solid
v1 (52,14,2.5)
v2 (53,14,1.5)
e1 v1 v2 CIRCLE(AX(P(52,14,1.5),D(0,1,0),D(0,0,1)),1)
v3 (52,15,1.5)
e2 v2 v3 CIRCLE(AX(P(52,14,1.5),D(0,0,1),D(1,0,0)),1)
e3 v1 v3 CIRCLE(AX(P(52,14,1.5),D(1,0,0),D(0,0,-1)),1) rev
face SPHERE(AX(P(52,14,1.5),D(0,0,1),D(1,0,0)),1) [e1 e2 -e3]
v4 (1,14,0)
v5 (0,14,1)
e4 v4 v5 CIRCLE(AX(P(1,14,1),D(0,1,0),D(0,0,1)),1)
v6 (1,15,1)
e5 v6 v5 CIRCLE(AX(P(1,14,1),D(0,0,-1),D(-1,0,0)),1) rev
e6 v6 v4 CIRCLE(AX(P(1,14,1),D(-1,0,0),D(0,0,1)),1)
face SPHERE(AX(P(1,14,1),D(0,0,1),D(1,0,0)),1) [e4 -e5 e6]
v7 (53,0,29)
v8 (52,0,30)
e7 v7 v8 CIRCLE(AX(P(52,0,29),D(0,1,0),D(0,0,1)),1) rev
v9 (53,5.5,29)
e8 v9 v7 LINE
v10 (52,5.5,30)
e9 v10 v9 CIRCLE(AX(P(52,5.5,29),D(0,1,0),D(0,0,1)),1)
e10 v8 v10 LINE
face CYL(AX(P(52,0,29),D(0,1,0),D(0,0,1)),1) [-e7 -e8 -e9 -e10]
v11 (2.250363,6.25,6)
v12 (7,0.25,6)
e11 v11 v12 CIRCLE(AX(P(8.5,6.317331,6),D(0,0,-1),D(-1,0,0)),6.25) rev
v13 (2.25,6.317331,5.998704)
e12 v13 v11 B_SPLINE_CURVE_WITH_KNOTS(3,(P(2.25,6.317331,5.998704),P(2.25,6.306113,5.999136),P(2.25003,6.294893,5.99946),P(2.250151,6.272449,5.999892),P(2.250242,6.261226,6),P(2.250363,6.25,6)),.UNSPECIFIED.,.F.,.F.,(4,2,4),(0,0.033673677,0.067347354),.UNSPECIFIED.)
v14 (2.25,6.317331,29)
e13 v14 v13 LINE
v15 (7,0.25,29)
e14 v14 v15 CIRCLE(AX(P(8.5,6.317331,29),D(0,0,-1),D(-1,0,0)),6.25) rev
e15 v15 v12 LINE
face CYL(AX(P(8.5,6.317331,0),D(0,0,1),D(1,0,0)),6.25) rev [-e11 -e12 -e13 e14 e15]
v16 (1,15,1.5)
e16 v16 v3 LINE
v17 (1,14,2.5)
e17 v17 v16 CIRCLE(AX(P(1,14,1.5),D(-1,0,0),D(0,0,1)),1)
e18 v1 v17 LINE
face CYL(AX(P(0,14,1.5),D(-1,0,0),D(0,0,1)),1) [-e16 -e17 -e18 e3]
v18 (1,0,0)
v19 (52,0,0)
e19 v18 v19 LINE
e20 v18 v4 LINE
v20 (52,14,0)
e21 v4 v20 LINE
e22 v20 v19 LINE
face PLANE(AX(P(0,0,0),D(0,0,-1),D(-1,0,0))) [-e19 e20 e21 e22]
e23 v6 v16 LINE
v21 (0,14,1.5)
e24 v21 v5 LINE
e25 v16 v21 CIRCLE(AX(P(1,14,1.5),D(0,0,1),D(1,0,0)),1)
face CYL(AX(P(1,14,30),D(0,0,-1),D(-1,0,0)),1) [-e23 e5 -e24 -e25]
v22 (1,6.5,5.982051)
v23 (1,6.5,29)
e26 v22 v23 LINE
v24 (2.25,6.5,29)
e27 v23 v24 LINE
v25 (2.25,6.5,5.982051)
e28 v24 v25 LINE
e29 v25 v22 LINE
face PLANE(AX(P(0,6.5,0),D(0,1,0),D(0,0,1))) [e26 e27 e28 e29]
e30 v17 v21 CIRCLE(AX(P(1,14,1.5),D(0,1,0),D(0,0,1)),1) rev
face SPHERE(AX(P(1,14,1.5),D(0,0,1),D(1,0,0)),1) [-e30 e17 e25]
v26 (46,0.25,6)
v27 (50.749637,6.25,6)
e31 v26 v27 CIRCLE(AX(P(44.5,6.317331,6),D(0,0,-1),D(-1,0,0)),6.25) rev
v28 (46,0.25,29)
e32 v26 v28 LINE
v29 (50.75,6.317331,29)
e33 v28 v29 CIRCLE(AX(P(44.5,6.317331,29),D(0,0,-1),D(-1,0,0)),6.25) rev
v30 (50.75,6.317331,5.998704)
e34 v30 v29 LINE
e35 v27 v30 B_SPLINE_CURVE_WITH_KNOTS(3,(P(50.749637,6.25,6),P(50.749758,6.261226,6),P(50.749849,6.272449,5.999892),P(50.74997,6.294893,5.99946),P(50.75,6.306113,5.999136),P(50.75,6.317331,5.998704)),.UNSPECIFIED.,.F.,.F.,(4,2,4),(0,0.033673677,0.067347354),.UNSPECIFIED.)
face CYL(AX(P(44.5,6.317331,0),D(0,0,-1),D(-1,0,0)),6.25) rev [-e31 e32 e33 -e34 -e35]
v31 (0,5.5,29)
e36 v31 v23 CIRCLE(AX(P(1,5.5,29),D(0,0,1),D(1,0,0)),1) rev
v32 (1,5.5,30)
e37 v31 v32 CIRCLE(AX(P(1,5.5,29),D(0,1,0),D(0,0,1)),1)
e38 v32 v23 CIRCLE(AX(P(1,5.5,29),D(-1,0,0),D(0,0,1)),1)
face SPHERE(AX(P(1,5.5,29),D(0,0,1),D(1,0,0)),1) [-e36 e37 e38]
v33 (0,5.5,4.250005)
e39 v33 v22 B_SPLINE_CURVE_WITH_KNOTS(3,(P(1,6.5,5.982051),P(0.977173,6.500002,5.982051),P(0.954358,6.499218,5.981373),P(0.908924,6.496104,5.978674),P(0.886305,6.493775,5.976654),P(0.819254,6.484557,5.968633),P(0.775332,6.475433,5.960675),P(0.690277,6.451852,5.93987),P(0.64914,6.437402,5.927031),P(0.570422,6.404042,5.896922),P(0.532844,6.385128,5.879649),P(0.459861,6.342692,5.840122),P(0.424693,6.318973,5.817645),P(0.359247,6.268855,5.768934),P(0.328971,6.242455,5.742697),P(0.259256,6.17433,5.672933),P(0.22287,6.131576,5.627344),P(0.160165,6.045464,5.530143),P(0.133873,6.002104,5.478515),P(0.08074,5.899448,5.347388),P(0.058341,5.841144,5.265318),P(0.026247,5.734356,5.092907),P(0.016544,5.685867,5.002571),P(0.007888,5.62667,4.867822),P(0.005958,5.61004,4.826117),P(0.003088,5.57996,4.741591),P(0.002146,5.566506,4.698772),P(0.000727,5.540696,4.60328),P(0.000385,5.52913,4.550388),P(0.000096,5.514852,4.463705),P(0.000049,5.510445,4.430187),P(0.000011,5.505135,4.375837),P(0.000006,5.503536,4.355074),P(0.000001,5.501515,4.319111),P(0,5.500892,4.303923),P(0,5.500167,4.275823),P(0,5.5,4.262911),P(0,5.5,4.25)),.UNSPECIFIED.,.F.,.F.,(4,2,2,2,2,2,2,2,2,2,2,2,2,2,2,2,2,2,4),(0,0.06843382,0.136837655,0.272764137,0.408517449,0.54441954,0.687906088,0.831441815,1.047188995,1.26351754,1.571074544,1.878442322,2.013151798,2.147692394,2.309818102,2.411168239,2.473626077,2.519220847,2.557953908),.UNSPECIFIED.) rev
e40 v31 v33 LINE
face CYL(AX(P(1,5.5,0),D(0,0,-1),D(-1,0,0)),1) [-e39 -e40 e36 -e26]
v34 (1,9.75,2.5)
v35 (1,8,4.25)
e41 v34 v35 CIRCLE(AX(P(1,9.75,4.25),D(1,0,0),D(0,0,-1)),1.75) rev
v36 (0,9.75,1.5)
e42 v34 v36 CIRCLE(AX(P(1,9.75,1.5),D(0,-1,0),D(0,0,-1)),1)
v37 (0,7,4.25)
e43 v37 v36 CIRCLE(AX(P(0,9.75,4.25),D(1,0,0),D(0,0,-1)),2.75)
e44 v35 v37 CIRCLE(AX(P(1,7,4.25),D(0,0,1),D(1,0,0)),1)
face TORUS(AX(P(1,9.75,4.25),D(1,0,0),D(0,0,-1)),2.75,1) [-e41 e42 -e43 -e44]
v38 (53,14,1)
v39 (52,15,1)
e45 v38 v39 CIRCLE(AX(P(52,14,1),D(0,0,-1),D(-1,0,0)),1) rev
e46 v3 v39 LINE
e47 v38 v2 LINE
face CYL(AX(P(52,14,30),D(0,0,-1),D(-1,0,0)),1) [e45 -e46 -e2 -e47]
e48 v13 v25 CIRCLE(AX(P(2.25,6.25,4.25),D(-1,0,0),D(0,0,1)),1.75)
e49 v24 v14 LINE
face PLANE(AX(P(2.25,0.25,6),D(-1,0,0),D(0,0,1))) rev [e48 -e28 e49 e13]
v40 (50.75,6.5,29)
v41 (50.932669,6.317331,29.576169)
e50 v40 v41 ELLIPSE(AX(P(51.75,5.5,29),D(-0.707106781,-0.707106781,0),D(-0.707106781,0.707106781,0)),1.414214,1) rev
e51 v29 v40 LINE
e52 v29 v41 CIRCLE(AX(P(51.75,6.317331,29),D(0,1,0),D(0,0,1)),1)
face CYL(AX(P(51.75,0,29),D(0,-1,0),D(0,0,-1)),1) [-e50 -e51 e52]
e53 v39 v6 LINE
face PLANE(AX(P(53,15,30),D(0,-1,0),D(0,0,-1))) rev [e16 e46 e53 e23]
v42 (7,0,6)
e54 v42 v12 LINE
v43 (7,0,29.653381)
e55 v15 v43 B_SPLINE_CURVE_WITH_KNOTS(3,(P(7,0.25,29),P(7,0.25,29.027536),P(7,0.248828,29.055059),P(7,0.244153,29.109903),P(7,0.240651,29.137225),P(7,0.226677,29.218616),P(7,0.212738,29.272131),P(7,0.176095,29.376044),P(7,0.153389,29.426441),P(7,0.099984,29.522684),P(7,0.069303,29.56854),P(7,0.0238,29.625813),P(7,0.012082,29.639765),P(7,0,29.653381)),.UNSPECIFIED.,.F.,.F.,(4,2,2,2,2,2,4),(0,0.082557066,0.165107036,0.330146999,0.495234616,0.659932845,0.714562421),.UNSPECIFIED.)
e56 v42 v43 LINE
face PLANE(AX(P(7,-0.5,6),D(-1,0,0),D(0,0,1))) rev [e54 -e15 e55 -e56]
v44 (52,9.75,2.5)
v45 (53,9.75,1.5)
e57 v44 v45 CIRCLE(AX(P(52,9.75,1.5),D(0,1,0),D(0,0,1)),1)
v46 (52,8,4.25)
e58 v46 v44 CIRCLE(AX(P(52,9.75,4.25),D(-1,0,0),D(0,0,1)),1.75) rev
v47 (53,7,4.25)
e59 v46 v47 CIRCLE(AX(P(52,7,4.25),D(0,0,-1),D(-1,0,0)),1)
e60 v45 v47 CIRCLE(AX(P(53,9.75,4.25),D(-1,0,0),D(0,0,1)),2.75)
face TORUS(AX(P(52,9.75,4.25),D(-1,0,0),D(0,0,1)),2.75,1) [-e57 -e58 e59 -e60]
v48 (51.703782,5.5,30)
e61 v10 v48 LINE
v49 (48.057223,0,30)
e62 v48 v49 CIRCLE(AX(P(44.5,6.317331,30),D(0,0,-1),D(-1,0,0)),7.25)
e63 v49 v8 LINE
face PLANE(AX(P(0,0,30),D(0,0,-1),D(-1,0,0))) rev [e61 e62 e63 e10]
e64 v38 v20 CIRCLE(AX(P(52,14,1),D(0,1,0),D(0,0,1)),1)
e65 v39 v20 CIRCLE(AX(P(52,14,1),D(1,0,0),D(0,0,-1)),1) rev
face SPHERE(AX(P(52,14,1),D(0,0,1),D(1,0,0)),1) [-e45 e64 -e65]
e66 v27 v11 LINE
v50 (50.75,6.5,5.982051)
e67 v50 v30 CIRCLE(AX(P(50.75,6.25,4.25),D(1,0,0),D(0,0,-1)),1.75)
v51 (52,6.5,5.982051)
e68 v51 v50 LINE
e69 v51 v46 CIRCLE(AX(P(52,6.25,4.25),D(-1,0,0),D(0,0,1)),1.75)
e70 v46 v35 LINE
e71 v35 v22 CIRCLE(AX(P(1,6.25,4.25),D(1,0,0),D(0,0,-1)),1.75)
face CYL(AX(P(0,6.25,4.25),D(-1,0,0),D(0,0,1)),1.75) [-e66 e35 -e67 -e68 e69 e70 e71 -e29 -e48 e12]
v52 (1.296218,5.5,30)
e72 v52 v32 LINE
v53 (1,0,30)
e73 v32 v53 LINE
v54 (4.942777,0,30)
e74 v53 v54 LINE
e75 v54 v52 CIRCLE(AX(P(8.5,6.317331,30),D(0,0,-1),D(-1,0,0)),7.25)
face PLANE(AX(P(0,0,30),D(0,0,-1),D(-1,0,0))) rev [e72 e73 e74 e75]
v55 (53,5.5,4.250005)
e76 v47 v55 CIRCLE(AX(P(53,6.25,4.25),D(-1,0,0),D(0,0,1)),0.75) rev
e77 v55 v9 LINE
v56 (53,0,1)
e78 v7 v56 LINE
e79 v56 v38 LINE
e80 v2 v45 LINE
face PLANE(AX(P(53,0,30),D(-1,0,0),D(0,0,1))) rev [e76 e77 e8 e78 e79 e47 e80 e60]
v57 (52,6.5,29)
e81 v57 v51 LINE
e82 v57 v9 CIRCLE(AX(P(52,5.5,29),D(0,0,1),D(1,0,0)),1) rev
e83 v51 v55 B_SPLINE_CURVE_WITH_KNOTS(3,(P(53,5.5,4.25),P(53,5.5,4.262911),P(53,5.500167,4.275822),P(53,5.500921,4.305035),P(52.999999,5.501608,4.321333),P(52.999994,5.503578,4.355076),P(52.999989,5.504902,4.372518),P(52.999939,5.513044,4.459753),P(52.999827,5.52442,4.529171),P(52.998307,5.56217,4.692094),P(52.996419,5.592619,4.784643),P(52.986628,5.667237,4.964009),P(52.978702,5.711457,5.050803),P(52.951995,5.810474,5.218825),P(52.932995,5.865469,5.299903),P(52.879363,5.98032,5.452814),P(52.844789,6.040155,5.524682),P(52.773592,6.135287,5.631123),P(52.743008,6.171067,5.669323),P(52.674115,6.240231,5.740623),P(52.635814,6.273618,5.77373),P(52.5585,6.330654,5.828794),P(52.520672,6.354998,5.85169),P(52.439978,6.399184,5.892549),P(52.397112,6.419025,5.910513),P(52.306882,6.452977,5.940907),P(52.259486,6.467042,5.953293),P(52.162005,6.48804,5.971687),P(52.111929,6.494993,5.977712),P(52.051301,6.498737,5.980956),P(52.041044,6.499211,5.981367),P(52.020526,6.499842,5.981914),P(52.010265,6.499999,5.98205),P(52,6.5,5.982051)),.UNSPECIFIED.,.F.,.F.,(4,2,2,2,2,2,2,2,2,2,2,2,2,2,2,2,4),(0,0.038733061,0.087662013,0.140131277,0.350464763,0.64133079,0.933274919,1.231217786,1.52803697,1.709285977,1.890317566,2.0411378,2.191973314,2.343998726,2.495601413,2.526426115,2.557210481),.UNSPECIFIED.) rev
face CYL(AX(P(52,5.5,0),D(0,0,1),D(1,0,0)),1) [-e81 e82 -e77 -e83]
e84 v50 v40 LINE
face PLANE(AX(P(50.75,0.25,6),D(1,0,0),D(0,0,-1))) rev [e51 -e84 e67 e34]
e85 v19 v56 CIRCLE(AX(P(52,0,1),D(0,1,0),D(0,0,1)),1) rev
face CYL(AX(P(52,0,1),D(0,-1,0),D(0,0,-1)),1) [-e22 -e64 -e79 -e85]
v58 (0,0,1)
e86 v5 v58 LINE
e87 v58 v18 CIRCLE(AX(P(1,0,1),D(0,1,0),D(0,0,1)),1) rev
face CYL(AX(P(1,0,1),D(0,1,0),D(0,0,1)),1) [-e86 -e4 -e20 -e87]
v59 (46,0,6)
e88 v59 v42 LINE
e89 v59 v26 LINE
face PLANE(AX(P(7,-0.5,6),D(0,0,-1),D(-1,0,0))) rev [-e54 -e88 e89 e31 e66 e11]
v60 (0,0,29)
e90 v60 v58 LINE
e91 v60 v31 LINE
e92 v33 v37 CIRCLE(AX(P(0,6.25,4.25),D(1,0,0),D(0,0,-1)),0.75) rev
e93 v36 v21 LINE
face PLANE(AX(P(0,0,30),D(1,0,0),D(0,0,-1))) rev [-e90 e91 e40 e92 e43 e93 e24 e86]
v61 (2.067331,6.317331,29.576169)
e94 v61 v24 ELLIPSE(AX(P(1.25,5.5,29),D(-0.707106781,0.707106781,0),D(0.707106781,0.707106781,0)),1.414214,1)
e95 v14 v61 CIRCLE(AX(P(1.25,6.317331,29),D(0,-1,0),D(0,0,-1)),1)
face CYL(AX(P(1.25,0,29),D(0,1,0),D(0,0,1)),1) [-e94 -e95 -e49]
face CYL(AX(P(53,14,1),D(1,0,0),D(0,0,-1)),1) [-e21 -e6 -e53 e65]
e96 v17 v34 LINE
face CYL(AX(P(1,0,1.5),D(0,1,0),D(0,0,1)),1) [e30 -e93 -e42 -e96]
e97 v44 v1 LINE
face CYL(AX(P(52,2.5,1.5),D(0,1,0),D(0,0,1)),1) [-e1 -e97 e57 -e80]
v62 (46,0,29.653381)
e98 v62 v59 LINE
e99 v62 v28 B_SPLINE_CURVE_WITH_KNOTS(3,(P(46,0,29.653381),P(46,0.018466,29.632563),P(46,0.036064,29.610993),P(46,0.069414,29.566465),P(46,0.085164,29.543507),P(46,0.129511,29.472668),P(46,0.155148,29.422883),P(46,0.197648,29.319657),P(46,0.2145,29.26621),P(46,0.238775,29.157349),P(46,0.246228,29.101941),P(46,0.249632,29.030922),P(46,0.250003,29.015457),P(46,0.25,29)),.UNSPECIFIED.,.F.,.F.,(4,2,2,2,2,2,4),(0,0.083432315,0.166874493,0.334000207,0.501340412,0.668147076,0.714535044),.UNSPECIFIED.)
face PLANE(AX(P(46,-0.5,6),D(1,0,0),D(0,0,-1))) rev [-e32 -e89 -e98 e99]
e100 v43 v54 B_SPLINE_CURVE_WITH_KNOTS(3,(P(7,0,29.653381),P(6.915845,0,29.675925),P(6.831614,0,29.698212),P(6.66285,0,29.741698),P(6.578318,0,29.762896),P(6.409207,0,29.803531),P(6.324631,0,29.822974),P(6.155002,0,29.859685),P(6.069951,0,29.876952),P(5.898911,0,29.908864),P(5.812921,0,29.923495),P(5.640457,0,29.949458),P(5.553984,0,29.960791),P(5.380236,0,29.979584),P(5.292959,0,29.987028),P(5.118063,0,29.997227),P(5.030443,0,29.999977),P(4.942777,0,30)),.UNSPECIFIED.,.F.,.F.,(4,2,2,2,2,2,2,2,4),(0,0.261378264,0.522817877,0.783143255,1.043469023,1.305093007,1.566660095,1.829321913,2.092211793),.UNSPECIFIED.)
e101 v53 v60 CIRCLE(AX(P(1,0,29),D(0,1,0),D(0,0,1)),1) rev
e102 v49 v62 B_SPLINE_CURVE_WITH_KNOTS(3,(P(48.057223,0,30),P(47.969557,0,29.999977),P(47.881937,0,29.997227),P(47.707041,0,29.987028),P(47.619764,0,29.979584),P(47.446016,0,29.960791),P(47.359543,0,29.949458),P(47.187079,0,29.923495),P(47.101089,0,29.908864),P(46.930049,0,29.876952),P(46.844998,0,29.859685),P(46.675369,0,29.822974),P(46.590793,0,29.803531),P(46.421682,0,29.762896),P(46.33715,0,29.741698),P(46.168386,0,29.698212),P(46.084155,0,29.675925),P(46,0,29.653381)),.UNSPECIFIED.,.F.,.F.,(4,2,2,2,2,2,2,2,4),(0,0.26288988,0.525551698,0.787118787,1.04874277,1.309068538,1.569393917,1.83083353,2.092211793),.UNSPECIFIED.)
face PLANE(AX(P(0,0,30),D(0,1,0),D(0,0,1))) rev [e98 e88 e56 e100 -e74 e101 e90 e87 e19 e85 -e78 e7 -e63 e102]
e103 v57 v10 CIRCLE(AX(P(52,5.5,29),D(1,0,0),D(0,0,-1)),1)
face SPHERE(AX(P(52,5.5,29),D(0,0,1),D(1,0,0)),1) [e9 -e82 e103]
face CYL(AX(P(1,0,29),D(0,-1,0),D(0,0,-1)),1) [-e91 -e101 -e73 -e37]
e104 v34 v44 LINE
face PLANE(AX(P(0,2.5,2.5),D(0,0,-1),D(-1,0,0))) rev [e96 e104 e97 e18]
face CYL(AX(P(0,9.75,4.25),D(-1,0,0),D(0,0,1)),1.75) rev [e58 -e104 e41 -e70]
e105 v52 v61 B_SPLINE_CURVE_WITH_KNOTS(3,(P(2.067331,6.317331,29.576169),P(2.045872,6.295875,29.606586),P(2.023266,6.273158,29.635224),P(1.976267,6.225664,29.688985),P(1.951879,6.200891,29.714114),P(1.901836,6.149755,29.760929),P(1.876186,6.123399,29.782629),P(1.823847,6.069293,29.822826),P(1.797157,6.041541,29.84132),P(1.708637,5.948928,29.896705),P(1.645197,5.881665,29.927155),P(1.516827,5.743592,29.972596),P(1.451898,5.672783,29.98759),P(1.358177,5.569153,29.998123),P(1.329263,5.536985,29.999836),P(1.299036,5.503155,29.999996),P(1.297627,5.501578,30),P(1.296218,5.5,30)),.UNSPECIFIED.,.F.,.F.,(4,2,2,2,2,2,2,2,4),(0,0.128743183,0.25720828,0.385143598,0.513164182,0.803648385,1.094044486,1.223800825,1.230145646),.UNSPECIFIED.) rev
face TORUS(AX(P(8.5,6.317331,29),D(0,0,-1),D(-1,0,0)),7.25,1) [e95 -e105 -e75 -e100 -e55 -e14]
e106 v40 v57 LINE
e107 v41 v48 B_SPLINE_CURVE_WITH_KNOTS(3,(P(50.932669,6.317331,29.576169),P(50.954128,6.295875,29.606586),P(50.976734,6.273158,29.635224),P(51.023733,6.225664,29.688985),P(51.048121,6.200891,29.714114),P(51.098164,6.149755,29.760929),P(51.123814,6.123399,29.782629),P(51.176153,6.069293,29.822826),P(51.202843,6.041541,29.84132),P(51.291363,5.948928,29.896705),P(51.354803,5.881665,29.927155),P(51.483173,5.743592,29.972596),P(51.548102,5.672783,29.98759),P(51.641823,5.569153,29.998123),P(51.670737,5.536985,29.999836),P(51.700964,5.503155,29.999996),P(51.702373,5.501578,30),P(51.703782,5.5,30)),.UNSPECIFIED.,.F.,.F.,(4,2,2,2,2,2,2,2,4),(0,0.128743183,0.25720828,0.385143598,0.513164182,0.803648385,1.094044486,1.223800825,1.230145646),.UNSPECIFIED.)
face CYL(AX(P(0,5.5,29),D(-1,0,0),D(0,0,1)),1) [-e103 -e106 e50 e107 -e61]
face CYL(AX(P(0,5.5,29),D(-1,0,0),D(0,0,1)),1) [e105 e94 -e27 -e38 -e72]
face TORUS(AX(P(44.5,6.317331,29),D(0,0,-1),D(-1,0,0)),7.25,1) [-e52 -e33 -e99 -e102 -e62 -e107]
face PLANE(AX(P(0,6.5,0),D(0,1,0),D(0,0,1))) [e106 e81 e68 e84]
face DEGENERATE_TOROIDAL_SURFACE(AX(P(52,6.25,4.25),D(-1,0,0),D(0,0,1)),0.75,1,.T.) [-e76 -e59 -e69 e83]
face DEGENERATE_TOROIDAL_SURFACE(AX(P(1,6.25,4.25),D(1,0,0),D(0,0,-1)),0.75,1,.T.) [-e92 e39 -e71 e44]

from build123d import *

# Parameters (mm, degrees)
ESQUISSE1_W             = 53
ESQUISSE1_H             = 20
BOSS_EXTRU_1_DEPTH      = 30
ESQUISSE2_W             = 53
ESQUISSE2_H             = 27.5
ENL_V_MAT_EXTRU_1_DEPTH = 17.5
ESQUISSE8_W             = 53
ESQUISSE8_H             = 5
ENL_V_MAT_EXTRU_5_DEPTH = 65.101482042
ESQUISSE10_W            = 39
ESQUISSE10_H            = 24
ENL_V_MAT_EXTRU_6_DEPTH = 3
ESQUISSE11_W            = 53
ESQUISSE11_H            = 3.5
BOSS_EXTRU_3_DEPTH      = 5.5
ESQUISSE12_W            = 4.75
ESQUISSE12_H            = 24
ENL_V_MAT_EXTRU_7_DEPTH = 2.25
ESQUISSE13_W            = 2.25
ESQUISSE13_H            = 24
BOSS_EXTRU_4_DEPTH      = 4
CONG_14_R               = 1.75
CONG_16_R               = 6.25
CONG_17_R               = 1


# Some blends are built 0.0001 mm under size
with BuildPart() as part:
    # Esquisse1 → Boss.-Extru.1 (new body)
    with BuildSketch(Plane.XY):
        with Locations((26.5, 10)):
            Rectangle(ESQUISSE1_W, ESQUISSE1_H)
    extrude(amount=BOSS_EXTRU_1_DEPTH)

    # Esquisse2 → Enlèv. mat.-Extru.1 (cut)
    with BuildSketch(Plane(origin=(0, 20, 0), x_dir=(1, 0, 0), z_dir=(0, 1, 0))):
        with Locations((26.5, -16.25)):
            Rectangle(ESQUISSE2_W, ESQUISSE2_H)
    extrude(amount=-ENL_V_MAT_EXTRU_1_DEPTH, mode=Mode.SUBTRACT)

    # Esquisse8 → Enlèv. mat.-Extru.5 (cut, through all)
    with BuildSketch(Plane(origin=(0, 0, 0), x_dir=(-1, 0, 0), z_dir=(0, 0, -1))):
        with Locations((-26.5, 17.5)):
            Rectangle(ESQUISSE8_W, ESQUISSE8_H)
    extrude(amount=-ENL_V_MAT_EXTRU_5_DEPTH, mode=Mode.SUBTRACT)

    # Esquisse10 → Enlèv. mat.-Extru.6 (cut)
    with BuildSketch(Plane(origin=(0, 2.5, 0), x_dir=(1, 0, 0), z_dir=(0, 1, 0))):
        with Locations((26.5, -18)):
            Rectangle(ESQUISSE10_W, ESQUISSE10_H)
    extrude(amount=-ENL_V_MAT_EXTRU_6_DEPTH, mode=Mode.SUBTRACT)

    # Esquisse11 → Boss.-Extru.3 (add)
    with BuildSketch(Plane(origin=(0, 2.5, 0), x_dir=(1, 0, 0), z_dir=(0, 1, 0))):
        with Locations((26.5, -4.25)):
            Rectangle(ESQUISSE11_W, ESQUISSE11_H)
    extrude(amount=BOSS_EXTRU_3_DEPTH)

    # Esquisse12 → Enlèv. mat.-Extru.7 (cut)
    with BuildSketch(Plane(origin=(0, 2.5, 0), x_dir=(1, 0, 0), z_dir=(0, 1, 0))):
        with Locations((4.625, -18)):
            Rectangle(ESQUISSE12_W, ESQUISSE12_H)
        with Locations((48.375, -18)):
            Rectangle(ESQUISSE12_W, ESQUISSE12_H)
    extrude(amount=-ENL_V_MAT_EXTRU_7_DEPTH, mode=Mode.SUBTRACT)

    # Esquisse13 → Boss.-Extru.4 (add)
    with BuildSketch(Plane(origin=(0, 2.5, 0), x_dir=(1, 0, 0), z_dir=(0, 1, 0))):
        with Locations((1.125, -18)):
            Rectangle(ESQUISSE13_W, ESQUISSE13_H)
        with Locations((51.875, -18)):
            Rectangle(ESQUISSE13_W, ESQUISSE13_H)
    extrude(amount=BOSS_EXTRU_4_DEPTH)

    # Congé14
    cong_14_edges = [part.edges().sort_by_distance(p)[0] for p in [
        (26.5, 8, 6),
        (26.5, 8, 2.5),
    ]]
    fillet(cong_14_edges, radius=CONG_14_R - 0.0001)  # a hair under: the kernel refuses the full size

    # Congé16
    # the kernel refuses this fillet: 6.25 mm, written as the material it adds along each edge
    with BuildSketch(Plane(origin=(2.25, 0.25, 30), x_dir=(0, 1, 0), z_dir=(0, 0, -1)), Plane(origin=(50.75, 0.25, 6), x_dir=(0, 1, 0), z_dir=(0, 0, 1))) as cong_16_piece_1:
        with BuildLine():
            CenterArc((6.06733055, 6.25), CONG_16_R, 193.886540363, 76.113459637)
            Line((0, 4.75), (-0.121346611, 4.72))
            ThreePointArc((-0.121346611, 4.72), (-0.125, 2.375), (-0.125, 0))
            Line((-0.125, 0), (0, -0.125))
            Line((0, -0.125), (6.06733055, -0.125))
            Line((6.06733055, -0.125), (6.06733055, 0))
        make_face()
    extrude(amount=24)

    # Congé17
    # the kernel refuses this fillet: 1 mm, written as the material it takes off along each edge
    with BuildSketch(Plane(origin=(52, 14, 1.5), x_dir=(1, 0, 0), z_dir=(0, 1, 0))) as cong_17_piece_1_section:
        Polygon((0, 0), (CONG_17_R, 0), (CONG_17_R, -CONG_17_R), (0, -CONG_17_R), align=None)
    cong_17_piece_1 = extrude(amount=CONG_17_R, mode=Mode.PRIVATE)
    cong_17_piece_1 = cong_17_piece_1 - Plane(origin=(52, 14, 1.5), x_dir=(-0.7071067811865475, 0, -0.7071067811865475), z_dir=(0, 1, 0)) * Sphere(CONG_17_R, mode=Mode.PRIVATE)
    add(cong_17_piece_1, mode=Mode.SUBTRACT)
    with BuildSketch(Plane(origin=(1, 14, 1.5), x_dir=(0, 0, 1), z_dir=(0, 1, 0))) as cong_17_piece_2_section:
        Polygon((0, 0), (CONG_17_R, 0), (CONG_17_R, -CONG_17_R), (0, -CONG_17_R), align=None)
    cong_17_piece_2 = extrude(amount=CONG_17_R, mode=Mode.PRIVATE)
    cong_17_piece_2 = cong_17_piece_2 - Plane(origin=(1, 14, 1.5), x_dir=(0.7071067811865475, 0, -0.7071067811865475), z_dir=(0, 1, 0)) * Sphere(CONG_17_R, mode=Mode.PRIVATE)
    add(cong_17_piece_2, mode=Mode.SUBTRACT)
    with BuildSketch(Plane(origin=(52, 14, 1), x_dir=(0, 1, 0), z_dir=(0, 0, -1))) as cong_17_piece_3_section:
        Polygon((0, 0), (CONG_17_R, 0), (CONG_17_R, CONG_17_R), (0, CONG_17_R), align=None)
    cong_17_piece_3 = extrude(amount=CONG_17_R, mode=Mode.PRIVATE)
    cong_17_piece_3 = cong_17_piece_3 - Plane(origin=(52, 14, 1), x_dir=(-0.7071067811865475, -0.7071067811865475, 0), z_dir=(0, 0, -1)) * Sphere(CONG_17_R, mode=Mode.PRIVATE)
    add(cong_17_piece_3, mode=Mode.SUBTRACT)
    with BuildSketch(Plane(origin=(1, 14, 1), x_dir=(0, 1, 0), z_dir=(0, 0, -1))) as cong_17_piece_4_section:
        Polygon((0, 0), (CONG_17_R, 0), (CONG_17_R, -CONG_17_R), (0, -CONG_17_R), align=None)
    cong_17_piece_4 = extrude(amount=CONG_17_R, mode=Mode.PRIVATE)
    cong_17_piece_4 = cong_17_piece_4 - Plane(origin=(1, 14, 1), x_dir=(0.7071067811865475, -0.7071067811865475, 0), z_dir=(0, 0, -1)) * Sphere(CONG_17_R, mode=Mode.PRIVATE)
    add(cong_17_piece_4, mode=Mode.SUBTRACT)
    with BuildSketch(Plane(origin=(1, 5.5, 29), x_dir=(-1, 0, 0), z_dir=(0, 0, 1))) as cong_17_piece_5_section:
        Polygon((0, 0), (CONG_17_R, 0), (CONG_17_R, -CONG_17_R), (0, -CONG_17_R), align=None)
    cong_17_piece_5 = extrude(amount=CONG_17_R, mode=Mode.PRIVATE)
    cong_17_piece_5 = cong_17_piece_5 - Plane(origin=(1, 5.5, 29), x_dir=(0.7071067811865475, -0.7071067811865475, 0), z_dir=(0, 0, 1)) * Sphere(CONG_17_R, mode=Mode.PRIVATE)
    add(cong_17_piece_5, mode=Mode.SUBTRACT)
    with BuildSketch(Plane(origin=(52, 5.5, 29), x_dir=(1, 0, 0), z_dir=(0, 1, 0))) as cong_17_piece_6_section:
        Polygon((0, 0), (CONG_17_R, 0), (CONG_17_R, -CONG_17_R), (0, -CONG_17_R), align=None)
    cong_17_piece_6 = extrude(amount=CONG_17_R, mode=Mode.PRIVATE)
    cong_17_piece_6 = cong_17_piece_6 - Plane(origin=(52, 5.5, 29), x_dir=(-0.7071067811865475, 0, -0.7071067811865475), z_dir=(0, 1, 0)) * Sphere(CONG_17_R, mode=Mode.PRIVATE)
    add(cong_17_piece_6, mode=Mode.SUBTRACT)
    with BuildSketch(Plane(origin=(0, 6.2501, 4.2501), x_dir=(0, 1, 0), z_dir=(0, 0, -1))) as cong_17_piece_7_section:
        with BuildLine():
            CenterArc((1.7499 - CONG_17_R, CONG_17_R), CONG_17_R, 270, 90)
            Line((1.7499 - CONG_17_R, 0), (1.7499, 0))
            Line((1.7499, 0), (1.7499, CONG_17_R))
        make_face()
    cong_17_piece_7 = revolve(axis=Axis((0, 6.2501, 4.2501), (1, 0, 0)), revolution_arc=163.672570945, mode=Mode.PRIVATE)
    cong_17_piece_7 = split(cong_17_piece_7, bisect_by=Plane(origin=(0.246556044, 6.5, 5.177662637), z_dir=(0, 1, 0)), keep=Keep.TOP, mode=Mode.PRIVATE)
    add(cong_17_piece_7, mode=Mode.SUBTRACT)
    with BuildSketch(Plane(origin=(0, 9.7499, 4.2499), x_dir=(0, -1, 0), z_dir=(0, 0, 1))) as cong_17_piece_8:
        with BuildLine():
            CenterArc((1.7499 + CONG_17_R, CONG_17_R), CONG_17_R, 180, 90)
            Line((1.7499, CONG_17_R), (1.7499, 0))
            Line((1.7499, 0), (1.7499 + CONG_17_R, 0))
        make_face()
    revolve(axis=Axis((0, 9.7499, 4.2499), (1, 0, 0)), revolution_arc=90, mode=Mode.SUBTRACT)
    with BuildSketch(Plane(origin=(53, 14, 2.5), x_dir=(0, 0, -1), z_dir=(0, -1, 0))) as cong_17_piece_9:
        with BuildLine():
            CenterArc((CONG_17_R, -CONG_17_R), CONG_17_R, 90, 90)
            Line((0, -CONG_17_R), (0, 0))
            Line((0, 0), (CONG_17_R, 0))
        make_face()
    extrude(amount=4.2501, mode=Mode.SUBTRACT)
    with BuildSketch(Plane(origin=(53, 9.7499, 4.2499), x_dir=(0, -1, 0), z_dir=(0, 0, 1))) as cong_17_piece_10:
        with BuildLine():
            CenterArc((1.7499 + CONG_17_R, -CONG_17_R), CONG_17_R, 90, 90)
            Line((1.7499, -CONG_17_R), (1.7499, 0))
            Line((1.7499, 0), (1.7499 + CONG_17_R, 0))
        make_face()
    revolve(axis=Axis((53, 9.7499, 4.2499), (1, 0, 0)), revolution_arc=90, mode=Mode.SUBTRACT)
    with BuildSketch(Plane(origin=(0, 14, 2.5), x_dir=(0, 0, -1), z_dir=(0, -1, 0))) as cong_17_piece_11:
        with BuildLine():
            CenterArc((CONG_17_R, CONG_17_R), CONG_17_R, 180, 90)
            Line((0, CONG_17_R), (0, 0))
            Line((0, 0), (CONG_17_R, 0))
        make_face()
    extrude(amount=4.2501, mode=Mode.SUBTRACT)
    with BuildSketch(Plane(origin=(53, 15, 1), x_dir=(0, -1, 0), z_dir=(0, 0, 1))) as cong_17_piece_12:
        with BuildLine():
            CenterArc((CONG_17_R, -CONG_17_R), CONG_17_R, 90, 90)
            Line((0, -CONG_17_R), (0, 0))
            Line((0, 0), (CONG_17_R, 0))
        make_face()
    extrude(amount=0.5, mode=Mode.SUBTRACT)
    with BuildSketch(Plane(origin=(0, 15, 1), x_dir=(0, -1, 0), z_dir=(0, 0, 1))) as cong_17_piece_13:
        with BuildLine():
            CenterArc((CONG_17_R, CONG_17_R), CONG_17_R, 180, 90)
            Line((0, CONG_17_R), (0, 0))
            Line((0, 0), (CONG_17_R, 0))
        make_face()
    extrude(amount=0.5, mode=Mode.SUBTRACT)
    with BuildSketch(Plane(origin=(0, 14, 0), x_dir=(1, 0, 0), z_dir=(0, -1, 0)), Plane(origin=(53, -2.5, 0), x_dir=(-1, 0, 0), z_dir=(0, 1, 0))) as cong_17_piece_14:
        with BuildLine():
            CenterArc((CONG_17_R, CONG_17_R), CONG_17_R, 180, 90)
            Line((0, CONG_17_R), (0, 0))
            Line((0, 0), (CONG_17_R, 0))
        make_face()
    extrude(amount=16.5, mode=Mode.SUBTRACT)
    with BuildSketch(Plane(origin=(1, 15, 0), x_dir=(0, -1, 0), z_dir=(1, 0, 0))) as cong_17_piece_15:
        with BuildLine():
            CenterArc((CONG_17_R, -CONG_17_R), CONG_17_R, 90, 90)
            Line((0, -CONG_17_R), (0, 0))
            Line((0, 0), (CONG_17_R, 0))
        make_face()
    extrude(amount=51, mode=Mode.SUBTRACT)
    with BuildSketch(Plane(origin=(52, 15, 2.5), x_dir=(0, 0, -1), z_dir=(-1, 0, 0))) as cong_17_piece_16:
        with BuildLine():
            CenterArc((CONG_17_R, CONG_17_R), CONG_17_R, 180, 90)
            Line((0, CONG_17_R), (0, 0))
            Line((0, 0), (CONG_17_R, 0))
        make_face()
    extrude(amount=51, mode=Mode.SUBTRACT)
    with BuildSketch(Plane(origin=(53, 6.2501, 4.2501), x_dir=(0, 1, 0), z_dir=(0, 0, -1))) as cong_17_piece_17_section:
        with BuildLine():
            CenterArc((1.7499 - CONG_17_R, -CONG_17_R), CONG_17_R, 0, 90)
            Line((1.7499 - CONG_17_R, 0), (1.7499, 0))
            Line((1.7499, 0), (1.7499, -CONG_17_R))
        make_face()
    cong_17_piece_17 = revolve(axis=Axis((53, 6.2501, 4.2501), (1, 0, 0)), revolution_arc=163.672570945, mode=Mode.PRIVATE)
    cong_17_piece_17 = split(cong_17_piece_17, bisect_by=Plane(origin=(52.753443954, 6.5, 5.17766264), z_dir=(0, 1, 0)), keep=Keep.TOP, mode=Mode.PRIVATE)
    add(cong_17_piece_17, mode=Mode.SUBTRACT)
    with BuildSketch(Plane(origin=(0, 6.5, 29), x_dir=(1, 0, 0), z_dir=(0, 0, -1))) as cong_17_piece_18_section:
        with BuildLine():
            CenterArc((CONG_17_R, CONG_17_R), CONG_17_R, 180, 90)
            Line((0, CONG_17_R), (0, 0))
            Line((0, 0), (CONG_17_R, 0))
        make_face()
    cong_17_piece_18 = extrude(amount=25.517935797, mode=Mode.PRIVATE)
    cong_17_piece_18 = cong_17_piece_18 - Plane(origin=(0.226363525, 6.2501, 4.2501), x_dir=(0, 1, 0), z_dir=(-1, 0, 0)) * Cylinder(1.7499, 56, mode=Mode.PRIVATE)
    add(cong_17_piece_18, mode=Mode.SUBTRACT)
    with BuildSketch(Plane(origin=(53, 6.5, 3.482064203), x_dir=(0, -1, 0), z_dir=(0, 0, 1))) as cong_17_piece_19_section:
        with BuildLine():
            CenterArc((CONG_17_R, -CONG_17_R), CONG_17_R, 90, 90)
            Line((0, -CONG_17_R), (0, 0))
            Line((0, 0), (CONG_17_R, 0))
        make_face()
    cong_17_piece_19 = extrude(amount=25.517935797, mode=Mode.PRIVATE)
    cong_17_piece_19 = cong_17_piece_19 - Plane(origin=(52.773636475, 6.2501, 4.2501), x_dir=(0, 1, 0), z_dir=(-1, 0, 0)) * Cylinder(1.7499, 56, mode=Mode.PRIVATE)
    add(cong_17_piece_19, mode=Mode.SUBTRACT)
    with BuildSketch(Plane(origin=(53, 5.5, 30), x_dir=(0, 0, -1), z_dir=(0, -1, 0)), Plane(origin=(0, 5.5, 30), x_dir=(1, 0, 0), z_dir=(0, -1, 0))) as cong_17_piece_20:
        with BuildLine():
            CenterArc((CONG_17_R, -CONG_17_R), CONG_17_R, 90, 90)
            Line((0, -CONG_17_R), (0, 0))
            Line((0, 0), (CONG_17_R, 0))
        make_face()
    extrude(amount=8, mode=Mode.SUBTRACT)
    with BuildSketch(Plane(origin=(44.5, 6.31733055, 30), x_dir=(-0.15709561863932892, -0.9875833972907435, 0), z_dir=(-0.9875833972907435, 0.15709561863932892, 0))) as cong_17_piece_21:
        with BuildLine():
            CenterArc((6.25 + CONG_17_R, -CONG_17_R), CONG_17_R, 90, 90)
            Line((6.25 + CONG_17_R, 0), (6.25, 0))
            Line((6.25, 0), (6.25, -CONG_17_R))
        make_face()
    revolve(axis=Axis((44.5, 6.31733055, 30), (0, 0, 1)), revolution_arc=99.038355542, mode=Mode.SUBTRACT)
    with BuildSketch(Plane(origin=(52, 6.5, 30), x_dir=(0, -1, 0), z_dir=(-1, 0, 0)), Plane(origin=(4.75, 6.5, 30), x_dir=(0, -1, 0), z_dir=(-1, 0, 0))) as cong_17_piece_22:
        with BuildLine():
            CenterArc((CONG_17_R, -CONG_17_R), CONG_17_R, 90, 90)
            Line((0, -CONG_17_R), (0, 0))
            Line((0, 0), (CONG_17_R, 0))
        make_face()
    extrude(amount=3.75, mode=Mode.SUBTRACT)
    with BuildSketch(Plane(origin=(8.5, 6.31733055, 30), x_dir=(0.15709561863932892, -0.9875833972907435, 0), z_dir=(0.9875833972907435, 0.15709561863932892, 0))) as cong_17_piece_23:
        with BuildLine():
            CenterArc((6.25 + CONG_17_R, CONG_17_R), CONG_17_R, 180, 90)
            Line((6.25 + CONG_17_R, 0), (6.25, 0))
            Line((6.25, 0), (6.25, CONG_17_R))
        make_face()
    revolve(axis=Axis((8.5, 6.31733055, 30), (0, 0, -1)), revolution_arc=99.038355542, mode=Mode.SUBTRACT)
    with BuildSketch(Plane(origin=(2.25, 6.31733055, 30), x_dir=(0, 0, -1), z_dir=(0, 1, 0))) as cong_17_piece_24:
        with BuildLine():
            CenterArc((CONG_17_R, CONG_17_R), CONG_17_R, 180, 90)
            Line((0, CONG_17_R), (0, 0))
            Line((0, 0), (CONG_17_R, 0))
        make_face()
    extrude(amount=2.68266945, mode=Mode.SUBTRACT)
    with BuildSketch(Plane(origin=(50.75, 9, 30), x_dir=(1, 0, 0), z_dir=(0, -1, 0))) as cong_17_piece_25:
        with BuildLine():
            CenterArc((CONG_17_R, -CONG_17_R), CONG_17_R, 90, 90)
            Line((0, -CONG_17_R), (0, 0))
            Line((0, 0), (CONG_17_R, 0))
        make_face()
    extrude(amount=2.68266945, mode=Mode.SUBTRACT)
    with BuildSketch(Plane(origin=(53, 8, 4.2499), x_dir=(0, -1, 0), z_dir=(0, 0, 1)), Plane(origin=(0, 8, 4.2501), x_dir=(0, -1, 0), z_dir=(0, 0, -1))) as cong_17_piece_26:
        with BuildLine():
            CenterArc((CONG_17_R, -CONG_17_R), CONG_17_R, 90, 90)
            Line((0, -CONG_17_R), (0, 0))
            Line((0, 0), (CONG_17_R, 0))
        make_face()
    extrude(amount=0.0002, mode=Mode.SUBTRACT)
    with BuildSketch(Plane(origin=(0, 6.5, 29), x_dir=(1, 0, 0), z_dir=(0, 0, -1))) as cong_17_piece_27a_section:
        with BuildLine():
            CenterArc((CONG_17_R, CONG_17_R), CONG_17_R, 180, 90)
            Line((0, CONG_17_R), (0, 0))
            Line((0, 0), (CONG_17_R, 0))
        make_face()
    cong_17_piece_27a = extrude(amount=25.517935797, mode=Mode.PRIVATE)
    cong_17_piece_27a = cong_17_piece_27a & Plane(origin=(0.226685784, 6.2501, 4.2501), x_dir=(0, 1, 0), z_dir=(-1, 0, 0)) * Cylinder(1.7499, 56, mode=Mode.PRIVATE)
    with BuildSketch(Plane(origin=(0, 6.2501, 4.2501), x_dir=(0, 1, 0), z_dir=(0, 0, -1))) as cong_17_piece_27b_section:
        with BuildLine():
            CenterArc((1.7499 - CONG_17_R, CONG_17_R), CONG_17_R, 270, 90)
            Line((1.7499 - CONG_17_R, 0), (1.7499, 0))
            Line((1.7499, 0), (1.7499, CONG_17_R))
        make_face()
    cong_17_piece_27b = revolve(axis=Axis((0, 6.2501, 4.2501), (1, 0, 0)), revolution_arc=163.672570945, mode=Mode.PRIVATE)
    cong_17_piece_27b = split(cong_17_piece_27b, bisect_by=Plane(origin=(0.242344233, 6.5, 5.450399752), z_dir=(0, -1, 0)), keep=Keep.TOP, mode=Mode.PRIVATE)
    cong_17_piece_27 = cong_17_piece_27a & cong_17_piece_27b
    add(cong_17_piece_27, mode=Mode.SUBTRACT)
    with BuildSketch(Plane(origin=(53, 6.2501, 4.2501), x_dir=(0, 1, 0), z_dir=(0, 0, -1))) as cong_17_piece_28a_section:
        with BuildLine():
            CenterArc((1.7499 - CONG_17_R, -CONG_17_R), CONG_17_R, 0, 90)
            Line((1.7499 - CONG_17_R, 0), (1.7499, 0))
            Line((1.7499, 0), (1.7499, -CONG_17_R))
        make_face()
    cong_17_piece_28a = revolve(axis=Axis((53, 6.2501, 4.2501), (1, 0, 0)), revolution_arc=163.672570945, mode=Mode.PRIVATE)
    cong_17_piece_28a = split(cong_17_piece_28a, bisect_by=Plane(origin=(52.757655764, 6.5, 5.450399753), z_dir=(0, -1, 0)), keep=Keep.TOP, mode=Mode.PRIVATE)
    with BuildSketch(Plane(origin=(53, 6.5, 3.482064203), x_dir=(0, -1, 0), z_dir=(0, 0, 1))) as cong_17_piece_28b_section:
        with BuildLine():
            CenterArc((CONG_17_R, -CONG_17_R), CONG_17_R, 90, 90)
            Line((0, -CONG_17_R), (0, 0))
            Line((0, 0), (CONG_17_R, 0))
        make_face()
    cong_17_piece_28b = extrude(amount=25.517935797, mode=Mode.PRIVATE)
    cong_17_piece_28b = cong_17_piece_28b & Plane(origin=(52.773314223, 6.2501, 4.2501), x_dir=(0, 1, 0), z_dir=(-1, 0, 0)) * Cylinder(1.7499, 56, mode=Mode.PRIVATE)
    cong_17_piece_28 = cong_17_piece_28a & cong_17_piece_28b
    add(cong_17_piece_28, mode=Mode.SUBTRACT)


solid = part.part
